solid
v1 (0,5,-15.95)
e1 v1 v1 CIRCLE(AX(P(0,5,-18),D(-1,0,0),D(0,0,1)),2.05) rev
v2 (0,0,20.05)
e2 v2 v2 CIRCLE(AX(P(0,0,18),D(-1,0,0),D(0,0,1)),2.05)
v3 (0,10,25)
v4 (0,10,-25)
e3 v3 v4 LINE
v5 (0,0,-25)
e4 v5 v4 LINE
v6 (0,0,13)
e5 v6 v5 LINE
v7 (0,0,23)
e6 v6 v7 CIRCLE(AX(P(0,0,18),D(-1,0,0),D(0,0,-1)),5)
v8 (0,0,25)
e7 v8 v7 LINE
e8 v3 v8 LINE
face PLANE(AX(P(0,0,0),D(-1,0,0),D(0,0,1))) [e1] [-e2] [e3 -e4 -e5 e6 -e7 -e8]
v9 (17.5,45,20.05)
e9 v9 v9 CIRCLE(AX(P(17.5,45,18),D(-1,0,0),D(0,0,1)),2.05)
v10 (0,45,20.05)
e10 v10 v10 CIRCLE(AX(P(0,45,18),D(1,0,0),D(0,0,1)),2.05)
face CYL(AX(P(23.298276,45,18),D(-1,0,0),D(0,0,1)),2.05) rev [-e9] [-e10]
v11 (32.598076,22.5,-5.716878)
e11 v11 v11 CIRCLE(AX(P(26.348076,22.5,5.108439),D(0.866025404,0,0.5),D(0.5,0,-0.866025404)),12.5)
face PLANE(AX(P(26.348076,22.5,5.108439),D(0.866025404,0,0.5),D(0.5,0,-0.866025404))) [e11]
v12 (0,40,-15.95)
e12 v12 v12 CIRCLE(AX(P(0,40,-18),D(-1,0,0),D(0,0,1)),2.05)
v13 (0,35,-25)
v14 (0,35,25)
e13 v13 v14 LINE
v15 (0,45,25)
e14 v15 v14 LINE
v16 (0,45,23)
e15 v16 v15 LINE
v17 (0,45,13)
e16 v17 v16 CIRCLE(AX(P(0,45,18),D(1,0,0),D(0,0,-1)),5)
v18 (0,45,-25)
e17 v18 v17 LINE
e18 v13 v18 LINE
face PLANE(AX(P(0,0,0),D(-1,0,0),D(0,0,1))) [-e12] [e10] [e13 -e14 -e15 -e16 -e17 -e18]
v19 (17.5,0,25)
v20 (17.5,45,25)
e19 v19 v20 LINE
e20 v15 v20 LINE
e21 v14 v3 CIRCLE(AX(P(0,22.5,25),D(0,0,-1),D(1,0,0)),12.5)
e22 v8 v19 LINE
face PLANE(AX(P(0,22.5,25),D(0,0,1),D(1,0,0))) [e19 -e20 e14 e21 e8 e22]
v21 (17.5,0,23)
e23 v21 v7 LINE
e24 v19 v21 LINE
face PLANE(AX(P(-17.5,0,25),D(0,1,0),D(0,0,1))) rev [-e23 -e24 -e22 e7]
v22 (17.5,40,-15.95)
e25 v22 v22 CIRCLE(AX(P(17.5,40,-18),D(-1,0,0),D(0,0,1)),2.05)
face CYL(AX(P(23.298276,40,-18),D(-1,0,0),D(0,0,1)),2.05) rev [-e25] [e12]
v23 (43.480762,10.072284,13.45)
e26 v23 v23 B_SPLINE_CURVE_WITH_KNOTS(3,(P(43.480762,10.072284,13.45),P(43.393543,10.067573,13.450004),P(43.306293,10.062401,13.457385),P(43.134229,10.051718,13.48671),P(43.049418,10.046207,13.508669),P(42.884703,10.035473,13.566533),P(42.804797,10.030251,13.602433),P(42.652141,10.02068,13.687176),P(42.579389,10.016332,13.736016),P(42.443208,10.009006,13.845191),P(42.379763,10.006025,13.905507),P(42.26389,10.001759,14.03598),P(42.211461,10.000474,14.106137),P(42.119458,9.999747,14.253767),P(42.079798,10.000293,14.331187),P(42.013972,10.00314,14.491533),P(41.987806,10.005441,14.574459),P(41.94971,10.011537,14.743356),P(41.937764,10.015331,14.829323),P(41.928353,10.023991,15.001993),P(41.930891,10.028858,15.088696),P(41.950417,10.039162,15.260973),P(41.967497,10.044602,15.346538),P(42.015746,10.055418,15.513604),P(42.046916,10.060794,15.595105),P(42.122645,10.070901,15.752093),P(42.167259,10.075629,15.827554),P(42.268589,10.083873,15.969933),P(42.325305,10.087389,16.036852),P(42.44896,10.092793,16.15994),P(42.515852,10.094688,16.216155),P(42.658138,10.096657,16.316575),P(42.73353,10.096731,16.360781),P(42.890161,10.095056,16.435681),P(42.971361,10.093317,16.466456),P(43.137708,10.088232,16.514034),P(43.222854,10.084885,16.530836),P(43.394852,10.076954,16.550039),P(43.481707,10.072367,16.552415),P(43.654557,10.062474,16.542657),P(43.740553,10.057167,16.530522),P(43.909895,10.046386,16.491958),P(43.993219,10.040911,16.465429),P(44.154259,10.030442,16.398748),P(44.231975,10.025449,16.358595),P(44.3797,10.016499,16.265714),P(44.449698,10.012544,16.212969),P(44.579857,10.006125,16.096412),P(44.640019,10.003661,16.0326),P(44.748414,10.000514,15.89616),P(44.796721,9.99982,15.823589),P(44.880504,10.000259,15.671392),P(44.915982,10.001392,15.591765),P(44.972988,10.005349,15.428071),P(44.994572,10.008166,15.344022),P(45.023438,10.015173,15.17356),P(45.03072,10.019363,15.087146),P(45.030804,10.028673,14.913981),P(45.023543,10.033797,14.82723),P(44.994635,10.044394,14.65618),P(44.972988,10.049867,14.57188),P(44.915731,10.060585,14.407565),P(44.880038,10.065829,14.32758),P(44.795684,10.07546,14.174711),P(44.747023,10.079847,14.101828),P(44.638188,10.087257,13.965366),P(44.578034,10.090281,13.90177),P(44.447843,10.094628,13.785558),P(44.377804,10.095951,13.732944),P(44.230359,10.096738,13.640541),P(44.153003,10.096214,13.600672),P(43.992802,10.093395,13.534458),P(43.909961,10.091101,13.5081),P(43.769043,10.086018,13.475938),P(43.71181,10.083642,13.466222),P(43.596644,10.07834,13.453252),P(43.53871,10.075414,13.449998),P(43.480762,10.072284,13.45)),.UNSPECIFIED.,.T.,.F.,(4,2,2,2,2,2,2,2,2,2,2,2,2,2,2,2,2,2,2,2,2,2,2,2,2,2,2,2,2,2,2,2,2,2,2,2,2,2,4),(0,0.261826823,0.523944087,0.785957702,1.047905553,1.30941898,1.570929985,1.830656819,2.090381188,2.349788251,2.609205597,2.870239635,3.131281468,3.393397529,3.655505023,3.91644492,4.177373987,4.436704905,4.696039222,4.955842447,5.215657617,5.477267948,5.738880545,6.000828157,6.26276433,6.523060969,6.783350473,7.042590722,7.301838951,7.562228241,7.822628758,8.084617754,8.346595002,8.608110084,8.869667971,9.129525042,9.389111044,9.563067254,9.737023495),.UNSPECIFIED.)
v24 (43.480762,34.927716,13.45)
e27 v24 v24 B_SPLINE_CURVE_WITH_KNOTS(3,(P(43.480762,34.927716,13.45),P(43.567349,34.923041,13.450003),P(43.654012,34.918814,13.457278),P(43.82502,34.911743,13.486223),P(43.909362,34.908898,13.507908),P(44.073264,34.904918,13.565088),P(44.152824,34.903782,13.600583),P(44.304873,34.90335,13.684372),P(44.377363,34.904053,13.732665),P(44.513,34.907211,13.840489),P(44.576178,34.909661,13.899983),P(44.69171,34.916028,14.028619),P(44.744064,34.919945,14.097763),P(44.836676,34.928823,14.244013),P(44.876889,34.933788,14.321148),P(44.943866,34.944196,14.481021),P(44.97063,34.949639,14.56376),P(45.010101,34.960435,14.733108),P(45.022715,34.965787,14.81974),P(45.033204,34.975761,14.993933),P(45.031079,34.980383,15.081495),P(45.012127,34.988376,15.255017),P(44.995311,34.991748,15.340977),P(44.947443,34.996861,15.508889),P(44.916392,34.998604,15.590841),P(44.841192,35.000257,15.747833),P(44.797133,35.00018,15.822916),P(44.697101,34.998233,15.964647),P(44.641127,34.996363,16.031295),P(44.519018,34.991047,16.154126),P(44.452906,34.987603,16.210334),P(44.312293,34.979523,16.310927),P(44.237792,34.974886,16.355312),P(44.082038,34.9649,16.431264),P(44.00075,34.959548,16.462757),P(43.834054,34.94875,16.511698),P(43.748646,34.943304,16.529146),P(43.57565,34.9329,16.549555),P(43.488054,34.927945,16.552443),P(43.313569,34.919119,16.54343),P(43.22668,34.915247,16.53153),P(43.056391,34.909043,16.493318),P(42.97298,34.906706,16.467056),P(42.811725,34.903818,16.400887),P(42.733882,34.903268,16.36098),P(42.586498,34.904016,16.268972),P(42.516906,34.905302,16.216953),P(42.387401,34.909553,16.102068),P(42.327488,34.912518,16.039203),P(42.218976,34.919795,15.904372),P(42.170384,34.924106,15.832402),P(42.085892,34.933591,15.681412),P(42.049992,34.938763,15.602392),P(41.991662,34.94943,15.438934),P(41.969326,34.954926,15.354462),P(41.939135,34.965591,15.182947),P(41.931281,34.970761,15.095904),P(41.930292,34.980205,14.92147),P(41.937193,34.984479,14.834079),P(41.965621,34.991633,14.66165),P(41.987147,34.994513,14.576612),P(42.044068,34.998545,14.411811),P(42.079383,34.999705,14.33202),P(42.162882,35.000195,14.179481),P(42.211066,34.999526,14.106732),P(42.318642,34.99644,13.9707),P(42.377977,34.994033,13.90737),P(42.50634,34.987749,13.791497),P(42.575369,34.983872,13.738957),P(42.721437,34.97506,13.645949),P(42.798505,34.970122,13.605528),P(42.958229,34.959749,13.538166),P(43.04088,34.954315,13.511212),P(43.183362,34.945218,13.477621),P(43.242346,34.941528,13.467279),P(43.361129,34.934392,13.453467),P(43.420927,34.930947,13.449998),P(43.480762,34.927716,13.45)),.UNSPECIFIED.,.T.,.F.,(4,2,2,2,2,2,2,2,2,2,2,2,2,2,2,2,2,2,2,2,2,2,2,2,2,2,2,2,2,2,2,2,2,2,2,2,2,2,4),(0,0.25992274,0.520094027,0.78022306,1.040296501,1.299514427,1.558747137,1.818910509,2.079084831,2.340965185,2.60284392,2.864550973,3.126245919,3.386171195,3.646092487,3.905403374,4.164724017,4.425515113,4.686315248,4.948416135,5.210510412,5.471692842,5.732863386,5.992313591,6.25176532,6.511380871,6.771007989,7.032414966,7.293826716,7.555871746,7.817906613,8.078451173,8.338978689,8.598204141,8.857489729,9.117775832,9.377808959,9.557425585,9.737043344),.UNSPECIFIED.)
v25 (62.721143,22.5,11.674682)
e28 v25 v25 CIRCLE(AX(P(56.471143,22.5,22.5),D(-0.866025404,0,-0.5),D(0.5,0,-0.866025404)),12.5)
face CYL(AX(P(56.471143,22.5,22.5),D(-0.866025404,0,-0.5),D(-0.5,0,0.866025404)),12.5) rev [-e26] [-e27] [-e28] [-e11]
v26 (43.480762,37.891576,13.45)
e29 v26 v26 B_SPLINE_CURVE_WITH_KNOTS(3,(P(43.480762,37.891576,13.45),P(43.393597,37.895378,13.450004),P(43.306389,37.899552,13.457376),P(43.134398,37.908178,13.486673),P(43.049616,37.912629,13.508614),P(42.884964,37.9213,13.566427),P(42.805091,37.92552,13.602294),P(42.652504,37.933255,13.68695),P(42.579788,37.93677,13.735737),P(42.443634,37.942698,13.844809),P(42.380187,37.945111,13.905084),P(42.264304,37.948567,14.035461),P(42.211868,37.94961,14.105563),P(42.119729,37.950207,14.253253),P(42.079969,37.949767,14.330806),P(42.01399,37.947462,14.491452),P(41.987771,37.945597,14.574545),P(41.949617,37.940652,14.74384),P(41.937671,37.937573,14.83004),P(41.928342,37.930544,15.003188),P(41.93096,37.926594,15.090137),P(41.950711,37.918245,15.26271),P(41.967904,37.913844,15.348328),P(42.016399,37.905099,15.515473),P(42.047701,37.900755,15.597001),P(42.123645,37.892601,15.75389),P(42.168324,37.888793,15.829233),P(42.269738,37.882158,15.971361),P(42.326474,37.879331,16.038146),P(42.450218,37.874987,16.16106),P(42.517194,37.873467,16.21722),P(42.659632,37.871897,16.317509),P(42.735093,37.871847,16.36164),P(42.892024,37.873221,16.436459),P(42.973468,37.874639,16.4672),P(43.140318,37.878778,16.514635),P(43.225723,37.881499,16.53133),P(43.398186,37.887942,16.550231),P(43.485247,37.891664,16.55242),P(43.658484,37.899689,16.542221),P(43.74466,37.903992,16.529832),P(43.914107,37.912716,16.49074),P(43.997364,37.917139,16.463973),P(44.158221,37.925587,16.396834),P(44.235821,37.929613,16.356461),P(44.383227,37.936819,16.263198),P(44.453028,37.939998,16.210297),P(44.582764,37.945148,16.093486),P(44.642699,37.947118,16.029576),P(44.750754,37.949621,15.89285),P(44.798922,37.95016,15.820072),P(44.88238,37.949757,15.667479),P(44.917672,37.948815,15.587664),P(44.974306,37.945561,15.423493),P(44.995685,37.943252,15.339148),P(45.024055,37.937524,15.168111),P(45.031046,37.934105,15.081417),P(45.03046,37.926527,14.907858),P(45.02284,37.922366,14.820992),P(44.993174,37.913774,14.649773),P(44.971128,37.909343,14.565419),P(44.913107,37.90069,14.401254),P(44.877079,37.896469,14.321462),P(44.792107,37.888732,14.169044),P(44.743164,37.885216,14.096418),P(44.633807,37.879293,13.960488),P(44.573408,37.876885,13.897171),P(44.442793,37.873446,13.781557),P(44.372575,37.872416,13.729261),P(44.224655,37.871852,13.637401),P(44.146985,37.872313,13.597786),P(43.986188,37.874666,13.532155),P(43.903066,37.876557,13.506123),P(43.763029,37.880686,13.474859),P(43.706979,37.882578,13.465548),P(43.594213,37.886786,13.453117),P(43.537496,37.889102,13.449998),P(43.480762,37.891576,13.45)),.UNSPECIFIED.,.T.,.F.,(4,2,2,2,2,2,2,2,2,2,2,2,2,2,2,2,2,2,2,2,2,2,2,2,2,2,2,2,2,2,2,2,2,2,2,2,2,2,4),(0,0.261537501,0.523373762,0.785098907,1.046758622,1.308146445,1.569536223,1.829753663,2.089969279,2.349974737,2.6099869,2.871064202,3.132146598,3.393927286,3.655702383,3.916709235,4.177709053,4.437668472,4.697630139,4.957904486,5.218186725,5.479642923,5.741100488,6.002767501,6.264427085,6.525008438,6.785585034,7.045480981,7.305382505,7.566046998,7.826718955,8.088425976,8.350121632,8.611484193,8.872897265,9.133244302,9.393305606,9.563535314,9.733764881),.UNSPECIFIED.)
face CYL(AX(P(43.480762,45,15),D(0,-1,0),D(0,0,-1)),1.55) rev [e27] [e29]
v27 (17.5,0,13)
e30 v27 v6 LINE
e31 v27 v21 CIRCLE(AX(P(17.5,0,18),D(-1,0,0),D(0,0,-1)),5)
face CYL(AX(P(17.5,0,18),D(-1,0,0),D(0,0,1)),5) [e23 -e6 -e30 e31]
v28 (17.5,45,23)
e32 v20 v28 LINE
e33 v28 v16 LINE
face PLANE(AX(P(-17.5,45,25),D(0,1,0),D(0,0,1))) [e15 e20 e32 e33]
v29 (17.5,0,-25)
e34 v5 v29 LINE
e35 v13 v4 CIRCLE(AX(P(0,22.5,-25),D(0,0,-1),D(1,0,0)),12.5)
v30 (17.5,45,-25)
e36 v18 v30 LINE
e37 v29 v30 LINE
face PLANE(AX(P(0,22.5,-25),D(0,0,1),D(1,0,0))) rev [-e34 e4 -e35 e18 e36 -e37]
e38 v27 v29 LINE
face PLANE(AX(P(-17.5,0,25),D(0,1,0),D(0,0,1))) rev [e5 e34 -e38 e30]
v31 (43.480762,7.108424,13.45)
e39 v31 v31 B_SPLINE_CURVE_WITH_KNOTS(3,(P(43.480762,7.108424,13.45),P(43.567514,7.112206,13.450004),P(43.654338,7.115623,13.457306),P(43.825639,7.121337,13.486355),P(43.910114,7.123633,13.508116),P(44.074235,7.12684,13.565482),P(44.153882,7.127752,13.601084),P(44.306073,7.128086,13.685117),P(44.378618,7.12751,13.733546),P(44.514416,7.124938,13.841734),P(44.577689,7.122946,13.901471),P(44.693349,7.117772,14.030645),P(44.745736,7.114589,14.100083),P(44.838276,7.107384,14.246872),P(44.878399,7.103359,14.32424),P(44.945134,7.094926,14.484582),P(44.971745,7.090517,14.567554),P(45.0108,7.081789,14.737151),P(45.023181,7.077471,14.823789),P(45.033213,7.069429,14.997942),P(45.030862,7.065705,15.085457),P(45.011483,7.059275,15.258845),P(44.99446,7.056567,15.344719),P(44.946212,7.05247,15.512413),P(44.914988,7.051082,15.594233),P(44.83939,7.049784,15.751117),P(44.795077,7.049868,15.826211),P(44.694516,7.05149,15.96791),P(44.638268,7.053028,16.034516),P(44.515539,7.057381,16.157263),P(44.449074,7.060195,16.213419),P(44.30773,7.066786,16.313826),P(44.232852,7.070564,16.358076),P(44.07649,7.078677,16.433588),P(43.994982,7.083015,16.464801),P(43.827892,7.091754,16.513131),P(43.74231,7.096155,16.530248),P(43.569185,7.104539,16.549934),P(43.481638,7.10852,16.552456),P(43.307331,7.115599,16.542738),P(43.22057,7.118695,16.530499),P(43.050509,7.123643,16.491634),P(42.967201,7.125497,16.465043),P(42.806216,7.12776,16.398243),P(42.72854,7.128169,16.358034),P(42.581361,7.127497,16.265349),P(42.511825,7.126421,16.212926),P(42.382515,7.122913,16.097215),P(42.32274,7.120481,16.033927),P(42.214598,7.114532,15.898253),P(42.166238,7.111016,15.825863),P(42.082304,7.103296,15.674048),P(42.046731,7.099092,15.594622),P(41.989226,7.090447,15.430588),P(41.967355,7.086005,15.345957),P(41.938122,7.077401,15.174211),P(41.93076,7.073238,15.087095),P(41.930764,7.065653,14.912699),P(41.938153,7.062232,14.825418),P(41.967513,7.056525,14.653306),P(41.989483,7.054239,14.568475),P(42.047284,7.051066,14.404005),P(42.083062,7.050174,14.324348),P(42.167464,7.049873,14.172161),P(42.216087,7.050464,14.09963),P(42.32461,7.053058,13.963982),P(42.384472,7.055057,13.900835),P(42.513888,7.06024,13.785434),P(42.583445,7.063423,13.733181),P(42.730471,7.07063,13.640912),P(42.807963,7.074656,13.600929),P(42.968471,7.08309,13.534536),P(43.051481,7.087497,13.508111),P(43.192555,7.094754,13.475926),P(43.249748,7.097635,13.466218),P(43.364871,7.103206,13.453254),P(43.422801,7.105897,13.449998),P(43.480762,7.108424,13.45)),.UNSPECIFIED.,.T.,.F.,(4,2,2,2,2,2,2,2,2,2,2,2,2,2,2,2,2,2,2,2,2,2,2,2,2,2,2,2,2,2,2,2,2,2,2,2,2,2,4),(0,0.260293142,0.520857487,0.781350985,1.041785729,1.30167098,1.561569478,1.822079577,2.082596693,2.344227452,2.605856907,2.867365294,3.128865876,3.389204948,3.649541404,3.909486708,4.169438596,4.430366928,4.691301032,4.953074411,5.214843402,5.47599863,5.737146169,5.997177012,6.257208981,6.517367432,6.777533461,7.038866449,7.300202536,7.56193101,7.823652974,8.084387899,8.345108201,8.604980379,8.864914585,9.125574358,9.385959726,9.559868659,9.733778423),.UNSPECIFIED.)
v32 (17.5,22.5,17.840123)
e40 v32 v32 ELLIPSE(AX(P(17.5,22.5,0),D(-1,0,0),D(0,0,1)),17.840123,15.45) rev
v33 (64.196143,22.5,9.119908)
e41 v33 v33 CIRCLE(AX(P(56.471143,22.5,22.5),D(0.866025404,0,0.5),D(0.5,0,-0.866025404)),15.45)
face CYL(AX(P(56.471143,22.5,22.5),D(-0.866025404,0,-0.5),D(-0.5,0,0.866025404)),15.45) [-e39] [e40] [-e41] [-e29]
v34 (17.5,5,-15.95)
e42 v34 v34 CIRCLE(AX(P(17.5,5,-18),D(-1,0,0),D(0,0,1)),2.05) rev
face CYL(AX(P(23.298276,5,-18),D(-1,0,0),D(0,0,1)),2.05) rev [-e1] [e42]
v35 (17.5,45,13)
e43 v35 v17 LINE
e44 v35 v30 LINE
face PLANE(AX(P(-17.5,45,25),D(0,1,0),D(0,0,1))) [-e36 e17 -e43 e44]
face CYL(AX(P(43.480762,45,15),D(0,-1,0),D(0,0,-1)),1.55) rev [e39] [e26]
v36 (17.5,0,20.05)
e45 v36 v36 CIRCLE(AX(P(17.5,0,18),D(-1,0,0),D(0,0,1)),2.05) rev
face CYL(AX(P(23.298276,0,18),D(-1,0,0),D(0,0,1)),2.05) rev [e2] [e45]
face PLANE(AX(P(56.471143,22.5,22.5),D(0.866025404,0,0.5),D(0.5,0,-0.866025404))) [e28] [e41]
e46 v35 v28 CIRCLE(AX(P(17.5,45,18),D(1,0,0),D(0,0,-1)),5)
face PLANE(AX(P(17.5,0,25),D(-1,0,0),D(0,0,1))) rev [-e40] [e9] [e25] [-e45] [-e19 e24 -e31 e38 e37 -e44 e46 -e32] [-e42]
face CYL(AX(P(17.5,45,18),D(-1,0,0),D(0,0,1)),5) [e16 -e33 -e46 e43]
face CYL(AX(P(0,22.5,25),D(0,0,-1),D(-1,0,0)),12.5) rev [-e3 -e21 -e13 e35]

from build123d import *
from build123d.topology import SkipClean

# Parameters (mm, degrees)
BOSS_EXTRUDE1_DEPTH             = 25
BOSS_EXTRUDE2_REACH             = 65.362
BOSS_EXTRUDE2_DIRECTION_2_DEPTH = 30
SKETCH9_R                       = 2.05
CUT_EXTRUDE3_DEPTH              = 35
BOSS_EXTRUDE5_REACH             = 62.904
SKETCH13_R                      = 1.55
CUT_EXTRUDE4_DEPTH              = 87.217897417
SKETCH16_W                      = 50
SKETCH16_H                      = 45
CUT_EXTRUDE5_DEPTH              = 17.5
BOSS_EXTRUDE6_DEPTH             = 17.5
SKETCH20_R                      = 2.05
CUT_EXTRUDE6_DEPTH              = 17.5


with BuildPart() as part:
    # Sketch1 → Boss-Extrude1 (new, symmetric)
    with BuildSketch(Plane.XY):
        with BuildLine():
            Line((-17.5, 22.5), (-17.5, 0))
            Line((-17.5, 0), (17.5, 0))
            Line((17.5, 0), (17.5, 22.5))
            Line((17.5, 22.5), (12.5, 22.5))
            ThreePointArc((12.5, 22.5), (0, 10), (-12.5, 22.5))
            Line((-12.5, 22.5), (-17.5, 22.5))
        make_face()
    boss_extrude1 = extrude(amount=BOSS_EXTRUDE1_DEPTH, both=True)

    # Boss-Extrude2: up to this face of the body (flat: up to its plane)
    boss_extrude2_end = Plane(part.part.faces().sort_by_distance((17.5, 11.25, 0))[0])
    # Sketch5 → Boss-Extrude2 (add, up to the picked face)
    with BuildSketch(Plane(origin=(26.115381057, 0, 15.077722283), x_dir=(0.500000000000001, 0, -0.8660254037844382), z_dir=(0.8660254037844382, 0, 0.500000000000001)), mode=Mode.PRIVATE) as boss_extrude2_sk1:
        with BuildLine():
            Line((-6.7, 22.5), (-3.75, 22.5))
            ThreePointArc((-3.75, 22.5), (8.75, 10), (21.25, 22.5))
            Line((21.25, 22.5), (24.2, 22.5))
            ThreePointArc((24.2, 22.5), (8.75, 7.05), (-6.7, 22.5))
        make_face()
    boss_extrude2_tool1 = split(extrude(boss_extrude2_sk1.sketch, amount=-BOSS_EXTRUDE2_REACH, mode=Mode.PRIVATE), bisect_by=boss_extrude2_end, keep=Keep.BOTH, mode=Mode.PRIVATE)
    boss_extrude2 = boss_extrude2_tool1.solids().sort_by(Axis((23.502881, 22.154527, 19.602705), (-0.8660254037844382, 0, -0.500000000000001)))[0]
    add(boss_extrude2)

    # Sketch5 → Boss-Extrude2 direction 2 (add)
    with BuildSketch(Plane(origin=(26.115381057, 0, 15.077722283), x_dir=(0.500000000000001, 0, -0.8660254037844382), z_dir=(0.8660254037844382, 0, 0.500000000000001))):
        with BuildLine():
            Line((-6.7, 22.5), (-3.75, 22.5))
            ThreePointArc((-3.75, 22.5), (8.75, 10), (21.25, 22.5))
            Line((21.25, 22.5), (24.2, 22.5))
            ThreePointArc((24.2, 22.5), (8.75, 7.05), (-6.7, 22.5))
        make_face()
    boss_extrude2_direction_2 = extrude(amount=BOSS_EXTRUDE2_DIRECTION_2_DEPTH)

    # Sketch9 → Cut-Extrude3 (cut)
    with BuildSketch(Plane.ZY.offset(17.5)):
        with Locations((-18, 5)):
            Circle(SKETCH9_R)
    cut_extrude3 = extrude(amount=-CUT_EXTRUDE3_DEPTH, mode=Mode.SUBTRACT)

    # Boss-Extrude5: up to this face of the body (flat: up to its plane)
    boss_extrude5_end = Plane(part.part.faces().sort_by_distance((17.5, 17.19483523, 0))[0])
    # Sketch12 → Boss-Extrude5 (add, up to the picked face)
    with BuildSketch(Plane(origin=(21.973076211, 0, 12.686161466), x_dir=(0.4999999999999999, 0, -0.8660254037844388), z_dir=(0.8660254037844388, 0, 0.4999999999999999)), mode=Mode.PRIVATE) as boss_extrude5_sk1:
        with BuildLine():
            Line((-3.75, 22.5), (21.25, 22.5))
            ThreePointArc((21.25, 22.5), (8.75, 10), (-3.75, 22.5))
        make_face()
    boss_extrude5_tool1 = split(extrude(boss_extrude5_sk1.sketch, amount=-BOSS_EXTRUDE5_REACH, mode=Mode.PRIVATE), bisect_by=boss_extrude5_end, keep=Keep.BOTH, mode=Mode.PRIVATE)
    boss_extrude5 = boss_extrude5_tool1.solids().sort_by(Axis((26.348076, 17.194835, 5.108439), (-0.8660254037844388, 0, -0.4999999999999999)))[0]
    add(boss_extrude5)

    # Mirror1: Boss-Extrude1, Boss-Extrude2, Boss-Extrude2 direction 2, Cut-Extrude3, Boss-Extrude5 across plane
    with SkipClean():  # the faces are left unmerged after this step: merging them gives an invalid solid
        add(boss_extrude1.mirror(Plane(origin=(17.5, 22.5, 25), x_dir=(0, 0, 1), z_dir=(0, -1, 0))))
        add(boss_extrude2.mirror(Plane(origin=(17.5, 22.5, 25), x_dir=(0, 0, 1), z_dir=(0, -1, 0))))
        add(boss_extrude2_direction_2.mirror(Plane(origin=(17.5, 22.5, 25), x_dir=(0, 0, 1), z_dir=(0, -1, 0))))
        add(cut_extrude3.mirror(Plane(origin=(17.5, 22.5, 25), x_dir=(0, 0, 1), z_dir=(0, -1, 0))), mode=Mode.SUBTRACT)
        add(boss_extrude5.mirror(Plane(origin=(17.5, 22.5, 25), x_dir=(0, 0, 1), z_dir=(0, -1, 0))))

    # Sketch13 → Cut-Extrude4 (cut, through all)
    with SkipClean():  # the faces are left unmerged after this step: merging them gives an invalid solid
        with BuildSketch(Plane(origin=(0, 0, 0), x_dir=(1, 0, 0), z_dir=(0, 1, 0))):
            with Locations(Location((43.480762114, -15, 0), (0, 0, 90))):
                Circle(SKETCH13_R)
        extrude(amount=CUT_EXTRUDE4_DEPTH, mode=Mode.SUBTRACT)

    # Sketch16 → Cut-Extrude5 (cut)
    with SkipClean():  # the faces are left unmerged after this step: merging them gives an invalid solid
        with BuildSketch(Plane(origin=(0, 0, 0), x_dir=(0, 0, -1), z_dir=(1, 0, 0))):
            with Locations((0, 22.5)):
                Rectangle(SKETCH16_W, SKETCH16_H)
        extrude(amount=-CUT_EXTRUDE5_DEPTH, mode=Mode.SUBTRACT)
    add(part.part.scale(1), mode=Mode.REPLACE)  # the faces are merged on a copy

    # Sketch18 → Boss-Extrude6 (add)
    with BuildSketch(Plane.ZY):
        with BuildLine():
            Line((13, 0), (23, 0))
            ThreePointArc((23, 0), (18, -5), (13, 0))
        make_face()
    boss_extrude6 = extrude(amount=-BOSS_EXTRUDE6_DEPTH)

    # Sketch20 → Cut-Extrude6 (cut)
    with BuildSketch(Plane.ZY):
        with Locations((18, 0)):
            Circle(SKETCH20_R)
    cut_extrude6 = extrude(amount=-CUT_EXTRUDE6_DEPTH, mode=Mode.SUBTRACT)

    # Mirror2: Boss-Extrude6, Cut-Extrude6 across plane
    add(boss_extrude6.mirror(Plane.ZX.offset(22.5)))
    add(cut_extrude6.mirror(Plane.ZX.offset(22.5)), mode=Mode.SUBTRACT)


solid = part.part
